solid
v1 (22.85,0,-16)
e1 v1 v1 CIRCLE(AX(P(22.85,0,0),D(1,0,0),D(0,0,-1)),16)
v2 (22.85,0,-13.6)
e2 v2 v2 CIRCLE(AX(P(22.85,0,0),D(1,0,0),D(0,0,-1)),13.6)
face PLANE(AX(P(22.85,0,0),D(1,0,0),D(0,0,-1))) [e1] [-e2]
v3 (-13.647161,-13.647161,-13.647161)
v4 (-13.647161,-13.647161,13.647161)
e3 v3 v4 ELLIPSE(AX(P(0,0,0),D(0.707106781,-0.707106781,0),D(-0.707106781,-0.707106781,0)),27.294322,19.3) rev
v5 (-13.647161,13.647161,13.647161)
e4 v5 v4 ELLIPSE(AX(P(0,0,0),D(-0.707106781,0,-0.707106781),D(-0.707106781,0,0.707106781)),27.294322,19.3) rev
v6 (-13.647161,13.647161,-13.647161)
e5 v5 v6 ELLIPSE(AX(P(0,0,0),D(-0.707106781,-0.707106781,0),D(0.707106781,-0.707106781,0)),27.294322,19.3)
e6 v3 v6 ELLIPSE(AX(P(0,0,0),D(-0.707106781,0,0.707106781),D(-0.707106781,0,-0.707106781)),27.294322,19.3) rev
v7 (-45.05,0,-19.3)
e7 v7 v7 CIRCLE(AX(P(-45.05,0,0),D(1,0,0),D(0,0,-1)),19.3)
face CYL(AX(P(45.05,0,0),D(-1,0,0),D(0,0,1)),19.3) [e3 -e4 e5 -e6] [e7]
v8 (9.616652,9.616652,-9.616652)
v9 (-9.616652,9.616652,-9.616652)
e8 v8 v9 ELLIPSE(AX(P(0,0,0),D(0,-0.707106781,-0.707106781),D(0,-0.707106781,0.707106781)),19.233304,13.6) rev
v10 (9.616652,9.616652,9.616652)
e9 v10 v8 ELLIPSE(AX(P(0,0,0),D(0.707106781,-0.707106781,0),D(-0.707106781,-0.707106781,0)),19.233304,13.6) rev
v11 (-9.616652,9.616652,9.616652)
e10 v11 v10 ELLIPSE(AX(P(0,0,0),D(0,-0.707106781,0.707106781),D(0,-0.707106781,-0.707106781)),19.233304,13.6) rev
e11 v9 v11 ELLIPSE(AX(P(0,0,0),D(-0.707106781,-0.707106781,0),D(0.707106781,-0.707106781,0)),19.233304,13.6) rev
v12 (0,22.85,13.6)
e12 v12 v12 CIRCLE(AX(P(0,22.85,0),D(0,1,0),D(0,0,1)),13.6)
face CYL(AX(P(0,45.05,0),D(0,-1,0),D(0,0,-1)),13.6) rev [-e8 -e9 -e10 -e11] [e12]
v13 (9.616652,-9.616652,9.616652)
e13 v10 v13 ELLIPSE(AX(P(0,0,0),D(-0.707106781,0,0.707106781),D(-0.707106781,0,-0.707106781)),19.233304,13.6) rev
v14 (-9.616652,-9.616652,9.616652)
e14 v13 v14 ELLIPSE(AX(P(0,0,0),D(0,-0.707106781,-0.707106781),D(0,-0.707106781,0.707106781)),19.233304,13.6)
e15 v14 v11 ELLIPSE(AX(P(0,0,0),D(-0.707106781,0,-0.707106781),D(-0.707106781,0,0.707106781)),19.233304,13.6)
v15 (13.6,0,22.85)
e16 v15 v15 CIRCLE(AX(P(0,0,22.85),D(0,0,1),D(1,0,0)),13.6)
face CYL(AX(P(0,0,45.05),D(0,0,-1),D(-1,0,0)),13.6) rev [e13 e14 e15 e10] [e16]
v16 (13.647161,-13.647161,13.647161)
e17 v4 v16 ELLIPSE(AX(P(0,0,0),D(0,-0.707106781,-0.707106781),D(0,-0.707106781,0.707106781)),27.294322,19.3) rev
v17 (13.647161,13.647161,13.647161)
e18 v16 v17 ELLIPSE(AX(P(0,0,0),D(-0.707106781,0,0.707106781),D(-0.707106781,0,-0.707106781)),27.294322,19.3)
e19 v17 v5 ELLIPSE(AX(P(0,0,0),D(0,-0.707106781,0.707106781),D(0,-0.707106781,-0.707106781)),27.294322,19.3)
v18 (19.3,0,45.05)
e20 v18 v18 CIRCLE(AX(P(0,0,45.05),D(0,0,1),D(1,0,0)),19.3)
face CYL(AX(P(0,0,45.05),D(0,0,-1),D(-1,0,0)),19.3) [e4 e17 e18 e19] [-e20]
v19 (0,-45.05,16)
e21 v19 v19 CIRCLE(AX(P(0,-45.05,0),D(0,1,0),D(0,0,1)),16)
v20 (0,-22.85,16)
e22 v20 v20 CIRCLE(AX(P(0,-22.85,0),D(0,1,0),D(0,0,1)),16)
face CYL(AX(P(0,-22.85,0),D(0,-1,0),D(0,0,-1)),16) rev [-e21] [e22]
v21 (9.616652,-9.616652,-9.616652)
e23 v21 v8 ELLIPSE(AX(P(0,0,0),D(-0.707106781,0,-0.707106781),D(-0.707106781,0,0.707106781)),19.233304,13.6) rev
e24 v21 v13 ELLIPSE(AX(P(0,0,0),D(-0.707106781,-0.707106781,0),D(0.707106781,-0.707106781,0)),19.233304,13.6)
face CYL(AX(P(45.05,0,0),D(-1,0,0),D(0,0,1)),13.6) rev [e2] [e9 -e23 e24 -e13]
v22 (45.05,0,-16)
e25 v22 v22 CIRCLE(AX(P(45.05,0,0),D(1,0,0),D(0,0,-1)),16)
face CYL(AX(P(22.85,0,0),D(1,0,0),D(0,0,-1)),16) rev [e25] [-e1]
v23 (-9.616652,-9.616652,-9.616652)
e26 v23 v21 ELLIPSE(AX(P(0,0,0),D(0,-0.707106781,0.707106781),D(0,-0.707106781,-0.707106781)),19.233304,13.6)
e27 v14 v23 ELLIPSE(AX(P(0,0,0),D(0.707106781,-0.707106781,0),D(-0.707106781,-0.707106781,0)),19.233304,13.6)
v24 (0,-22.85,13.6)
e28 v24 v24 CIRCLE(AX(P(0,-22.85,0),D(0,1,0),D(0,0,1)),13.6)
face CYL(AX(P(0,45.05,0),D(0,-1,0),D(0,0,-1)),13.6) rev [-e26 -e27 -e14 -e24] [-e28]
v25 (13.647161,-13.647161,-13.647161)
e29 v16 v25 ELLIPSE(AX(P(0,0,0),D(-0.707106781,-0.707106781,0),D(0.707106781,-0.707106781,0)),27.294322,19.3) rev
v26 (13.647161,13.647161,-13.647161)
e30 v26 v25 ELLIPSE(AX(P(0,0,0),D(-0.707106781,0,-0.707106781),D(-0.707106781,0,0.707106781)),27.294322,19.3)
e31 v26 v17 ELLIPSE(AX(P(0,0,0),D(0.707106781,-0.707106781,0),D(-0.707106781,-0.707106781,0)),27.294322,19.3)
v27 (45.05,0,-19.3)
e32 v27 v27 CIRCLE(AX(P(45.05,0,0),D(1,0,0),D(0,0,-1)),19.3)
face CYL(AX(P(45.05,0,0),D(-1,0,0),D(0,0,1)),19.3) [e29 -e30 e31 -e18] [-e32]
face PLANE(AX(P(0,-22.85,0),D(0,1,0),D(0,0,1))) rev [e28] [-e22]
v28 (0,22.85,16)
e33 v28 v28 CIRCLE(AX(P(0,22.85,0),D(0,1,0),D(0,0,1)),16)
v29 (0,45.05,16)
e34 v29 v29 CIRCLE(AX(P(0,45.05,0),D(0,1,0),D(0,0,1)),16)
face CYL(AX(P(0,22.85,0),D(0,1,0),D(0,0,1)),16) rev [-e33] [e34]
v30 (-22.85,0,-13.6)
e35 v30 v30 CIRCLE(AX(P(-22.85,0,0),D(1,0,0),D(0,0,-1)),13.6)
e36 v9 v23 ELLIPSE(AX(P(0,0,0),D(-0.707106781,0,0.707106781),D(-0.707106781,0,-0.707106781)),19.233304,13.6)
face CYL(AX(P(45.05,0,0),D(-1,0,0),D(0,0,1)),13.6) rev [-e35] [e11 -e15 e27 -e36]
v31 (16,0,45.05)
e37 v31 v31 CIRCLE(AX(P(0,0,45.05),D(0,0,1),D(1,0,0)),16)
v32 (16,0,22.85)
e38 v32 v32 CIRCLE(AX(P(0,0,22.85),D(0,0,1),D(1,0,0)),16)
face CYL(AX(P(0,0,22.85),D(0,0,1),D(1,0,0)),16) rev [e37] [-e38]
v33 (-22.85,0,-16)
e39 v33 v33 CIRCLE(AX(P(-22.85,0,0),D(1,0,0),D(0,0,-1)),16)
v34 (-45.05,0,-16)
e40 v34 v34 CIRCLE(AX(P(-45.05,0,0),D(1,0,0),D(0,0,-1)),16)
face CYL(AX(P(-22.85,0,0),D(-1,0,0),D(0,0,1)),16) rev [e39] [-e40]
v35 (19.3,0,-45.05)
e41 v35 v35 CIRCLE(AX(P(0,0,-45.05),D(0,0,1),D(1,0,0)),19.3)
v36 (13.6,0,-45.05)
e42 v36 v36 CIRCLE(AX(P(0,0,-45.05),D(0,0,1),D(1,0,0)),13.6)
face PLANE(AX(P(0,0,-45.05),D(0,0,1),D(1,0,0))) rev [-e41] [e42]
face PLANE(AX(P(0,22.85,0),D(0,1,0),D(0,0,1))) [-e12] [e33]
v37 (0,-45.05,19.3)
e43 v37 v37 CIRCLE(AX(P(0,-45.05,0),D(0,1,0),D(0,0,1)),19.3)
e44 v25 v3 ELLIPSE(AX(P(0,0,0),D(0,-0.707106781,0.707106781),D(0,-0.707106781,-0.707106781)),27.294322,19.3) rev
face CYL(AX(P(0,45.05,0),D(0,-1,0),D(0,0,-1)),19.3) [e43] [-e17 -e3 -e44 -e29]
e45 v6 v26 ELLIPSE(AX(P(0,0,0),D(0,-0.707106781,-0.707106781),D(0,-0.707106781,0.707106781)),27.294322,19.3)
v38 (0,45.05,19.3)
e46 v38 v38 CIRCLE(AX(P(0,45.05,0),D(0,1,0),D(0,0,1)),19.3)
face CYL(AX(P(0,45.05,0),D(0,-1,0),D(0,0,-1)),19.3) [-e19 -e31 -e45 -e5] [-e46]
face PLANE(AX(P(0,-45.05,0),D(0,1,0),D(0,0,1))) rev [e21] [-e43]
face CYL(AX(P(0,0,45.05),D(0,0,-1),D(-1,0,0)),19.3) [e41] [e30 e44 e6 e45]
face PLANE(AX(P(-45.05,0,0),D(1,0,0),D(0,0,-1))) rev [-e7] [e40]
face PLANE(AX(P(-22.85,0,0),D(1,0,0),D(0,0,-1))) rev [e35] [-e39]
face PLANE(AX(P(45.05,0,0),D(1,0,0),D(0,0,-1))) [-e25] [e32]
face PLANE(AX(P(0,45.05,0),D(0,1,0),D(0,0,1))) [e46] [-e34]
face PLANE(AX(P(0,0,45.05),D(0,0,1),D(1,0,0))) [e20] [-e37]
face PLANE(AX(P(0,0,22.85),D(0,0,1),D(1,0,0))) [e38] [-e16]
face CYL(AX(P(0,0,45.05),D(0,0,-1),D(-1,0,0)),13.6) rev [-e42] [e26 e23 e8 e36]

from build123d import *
from OCP.BRepAlgoAPI import BRepAlgoAPI_Cut
from OCP.TopTools import TopTools_ListOfShape
from build123d.topology import SkipClean

# Parameters (mm, degrees)
SKETCH_1_R                = 19.3
SKETCH_1_R_2              = 13.6
EXTRUDE_1_DEPTH           = 45.05
SKETCH_3_R                = 19.3
SKETCH_3_R_2              = 13.6
EXTRUDE_3_DEPTH           = 45.05
SKETCH_2_R                = 19.3
SKETCH_2_R_2              = 13.6
EXTRUDE_2_DEPTH           = 45.05
CUT_EXTRUDE_1_DEPTH       = 79.028889054
CUT_EXTRUDE_1_DEPTH_BACK  = 79.028889054
SKETCH_1_13_R             = 13.6
CUT_EXTRUDE_START         = -45.0500001
CUT_EXTRUDE_2_OUTLINE_R   = 13.6
CUT_EXTRUDE_2_DEPTH       = 90.1000002
CUT_EXTRUDE_3_DEPTH       = 79.028889054
CUT_EXTRUDE_3_DEPTH_BACK  = 124.078889054
CUT_EXTRUDE_3_START       = 45.05
SKETCH_2_8_R              = 13.6
CUT_EXTRUDE_START_2       = -45.05
SKETCH_1_15_R             = 16
CUT_EXTRUDE_4_DEPTH       = 22.2
CUT_EXTRUDE_START_3       = 45.05
SKETCH_1_16_R             = 16
CUT_EXTRUDE_5_DEPTH       = 22.2
SKETCH_3_9_R              = 16
CUT_EXTRUDE_6_DEPTH       = 22.2
SKETCH_3_10_R             = 16
CUT_EXTRUDE_7_DEPTH       = 22.2
CUT_EXTRUDE_START_4       = 22.85
CUT_EXTRUDE_8_OUTLINE_R   = 16
CUT_EXTRUDE_8_OUTLINE_R_2 = 13.6
CUT_EXTRUDE_8_DEPTH       = 22.2


with BuildPart() as part:
    # 草图1 → 凸台-拉伸1 (new, symmetric)
    with BuildSketch(Plane(origin=(0, 0, 0), x_dir=(1, 0, 0), z_dir=(0, 1, 0))):
        with Locations(Location((0, 0, 0), (0, 0, 270))):
            Circle(SKETCH_1_R)
        with Locations(Location((0, 0, 0), (0, 0, 270))):
            Circle(SKETCH_1_R_2, mode=Mode.SUBTRACT)
    extrude(amount=EXTRUDE_1_DEPTH, both=True)

    # 草图3 → 凸台-拉伸3 (add, symmetric)
    with BuildSketch(Plane(origin=(0, 0, 0), x_dir=(0, 0, -1), z_dir=(1, 0, 0))):
        with Locations(Location((0, 0, 0), (0, 0, 135))):
            Circle(SKETCH_3_R)
        with Locations(Location((0, 0, 0), (0, 0, 135.000001563))):
            Circle(SKETCH_3_R_2, mode=Mode.SUBTRACT)
    extrude(amount=EXTRUDE_3_DEPTH, both=True)

    # 草图2 → 凸台-拉伸2 (add, symmetric)
    with BuildSketch(Plane.XY):
        with Locations(Location((0, 0, 0), (0, 0, 225))):
            Circle(SKETCH_2_R)
        with Locations(Location((0, 0, 0), (0, 0, 224.999996387))):
            Circle(SKETCH_2_R_2, mode=Mode.SUBTRACT)
    extrude(amount=EXTRUDE_2_DEPTH, both=True)

    # 草图1<13> → 切除-拉伸1 (cut, two sides: drawn at the far end of the back side and taken through both)
    with BuildSketch(Plane(origin=(0, 0, 0), x_dir=(1, 0, 0), z_dir=(0, 1, 0)).offset(-CUT_EXTRUDE_1_DEPTH_BACK)):
        with Locations(Location((0, 0, 0), (0, 0, 270))):
            Circle(SKETCH_1_13_R)
    extrude(amount=CUT_EXTRUDE_1_DEPTH + CUT_EXTRUDE_1_DEPTH_BACK, mode=Mode.SUBTRACT)

    # 切除-拉伸2: read off the stored shape, not the designer's step
    # 切除-拉伸2 outline → 切除-拉伸2 (cut)
    with BuildSketch(Plane(origin=(0, 0, 0), x_dir=(0, 0, -1), z_dir=(1, 0, 0)).offset(CUT_EXTRUDE_START)):
        Circle(CUT_EXTRUDE_2_OUTLINE_R)
    extrude(amount=CUT_EXTRUDE_2_DEPTH, mode=Mode.SUBTRACT)

    # 草图2<8> → 切除-拉伸3 (cut, two sides: drawn at the far end of the back side and taken through both)
    with BuildSketch(Plane.XY.offset(CUT_EXTRUDE_3_START - CUT_EXTRUDE_3_DEPTH_BACK)):
        with Locations(Location((0, 0, 0), (0, 0, 225))):
            Circle(SKETCH_2_8_R)
    extrude(amount=CUT_EXTRUDE_3_DEPTH + CUT_EXTRUDE_3_DEPTH_BACK, mode=Mode.SUBTRACT)


with BuildPart() as cut_extrude_3_kept_piece:
    # of the separate pieces the step leaves, the one the design keeps (cut_extrude_3_pieces_kept)
    add(part.part.solids().sort_by_distance((0, -45.05, 19.3))[0])

    # 草图1<15> → 切除-拉伸4 (cut)
    with SkipClean():  # the faces are left unmerged after this step: merging them gives an invalid solid
        with BuildSketch(Plane(origin=(0, 0, 0), x_dir=(1, 0, 0), z_dir=(0, 1, 0)).offset(CUT_EXTRUDE_START_2)):
            with Locations(Location((0, 0, 0), (0, 0, 270))):
                Circle(SKETCH_1_15_R)
        extrude(amount=CUT_EXTRUDE_4_DEPTH, mode=Mode.SUBTRACT)

    # 草图1<16> → 切除-拉伸5 (cut)
    with SkipClean():  # the faces are left unmerged after this step: merging them gives an invalid solid
        with BuildSketch(Plane(origin=(0, 0, 0), x_dir=(1, 0, 0), z_dir=(0, 1, 0)).offset(CUT_EXTRUDE_START_3)):
            with Locations(Location((0, 0, 0), (0, 0, 270))):
                Circle(SKETCH_1_16_R)
        extrude(amount=-CUT_EXTRUDE_5_DEPTH, mode=Mode.SUBTRACT)

    # 草图3<9> → 切除-拉伸6 (cut)
    with SkipClean():  # the faces are left unmerged after this step: merging them gives an invalid solid
        with BuildSketch(Plane(origin=(0, 0, 0), x_dir=(0, 0, -1), z_dir=(1, 0, 0)).offset(CUT_EXTRUDE_START_2)):
            Circle(SKETCH_3_9_R)
        extrude(amount=CUT_EXTRUDE_6_DEPTH, mode=Mode.SUBTRACT)

    # 草图3<10> → 切除-拉伸7 (cut)
    with SkipClean():  # the faces are left unmerged after this step: merging them gives an invalid solid
        with BuildSketch(Plane(origin=(0, 0, 0), x_dir=(0, 0, -1), z_dir=(1, 0, 0)).offset(CUT_EXTRUDE_START_3)):
            Circle(SKETCH_3_10_R)
        extrude(amount=-CUT_EXTRUDE_7_DEPTH, mode=Mode.SUBTRACT)


with BuildPart() as cut_extrude_8_tool:
    # 切除-拉伸8: read off the stored shape, not the designer's step
    # 切除-拉伸8 outline → 切除-拉伸8 (new body)
    with BuildSketch(Plane.XY.offset(CUT_EXTRUDE_START_4)):
        Circle(CUT_EXTRUDE_8_OUTLINE_R)
        Circle(CUT_EXTRUDE_8_OUTLINE_R_2, mode=Mode.SUBTRACT)
    extrude(amount=CUT_EXTRUDE_8_DEPTH)


with BuildPart() as cut_extrude_3_kept_piece_1:
    add(cut_extrude_3_kept_piece.part)

    # 切除-拉伸8: cut by cut_extrude_8_tool, with a tolerance
    cut_extrude_8_stock = TopTools_ListOfShape()
    cut_extrude_8_stock.Append(cut_extrude_3_kept_piece_1.part.wrapped)
    cut_extrude_8_tools = TopTools_ListOfShape()
    cut_extrude_8_tools.Append(cut_extrude_8_tool.part.wrapped)
    cut_extrude_8_cut = BRepAlgoAPI_Cut()
    cut_extrude_8_cut.SetArguments(cut_extrude_8_stock)
    cut_extrude_8_cut.SetTools(cut_extrude_8_tools)
    cut_extrude_8_cut.SetFuzzyValue(0.00001)
    cut_extrude_8_cut.Build()
    add(Compound.cast(cut_extrude_8_cut.Shape()).solids(), mode=Mode.REPLACE)


solid = cut_extrude_3_kept_piece_1.part
